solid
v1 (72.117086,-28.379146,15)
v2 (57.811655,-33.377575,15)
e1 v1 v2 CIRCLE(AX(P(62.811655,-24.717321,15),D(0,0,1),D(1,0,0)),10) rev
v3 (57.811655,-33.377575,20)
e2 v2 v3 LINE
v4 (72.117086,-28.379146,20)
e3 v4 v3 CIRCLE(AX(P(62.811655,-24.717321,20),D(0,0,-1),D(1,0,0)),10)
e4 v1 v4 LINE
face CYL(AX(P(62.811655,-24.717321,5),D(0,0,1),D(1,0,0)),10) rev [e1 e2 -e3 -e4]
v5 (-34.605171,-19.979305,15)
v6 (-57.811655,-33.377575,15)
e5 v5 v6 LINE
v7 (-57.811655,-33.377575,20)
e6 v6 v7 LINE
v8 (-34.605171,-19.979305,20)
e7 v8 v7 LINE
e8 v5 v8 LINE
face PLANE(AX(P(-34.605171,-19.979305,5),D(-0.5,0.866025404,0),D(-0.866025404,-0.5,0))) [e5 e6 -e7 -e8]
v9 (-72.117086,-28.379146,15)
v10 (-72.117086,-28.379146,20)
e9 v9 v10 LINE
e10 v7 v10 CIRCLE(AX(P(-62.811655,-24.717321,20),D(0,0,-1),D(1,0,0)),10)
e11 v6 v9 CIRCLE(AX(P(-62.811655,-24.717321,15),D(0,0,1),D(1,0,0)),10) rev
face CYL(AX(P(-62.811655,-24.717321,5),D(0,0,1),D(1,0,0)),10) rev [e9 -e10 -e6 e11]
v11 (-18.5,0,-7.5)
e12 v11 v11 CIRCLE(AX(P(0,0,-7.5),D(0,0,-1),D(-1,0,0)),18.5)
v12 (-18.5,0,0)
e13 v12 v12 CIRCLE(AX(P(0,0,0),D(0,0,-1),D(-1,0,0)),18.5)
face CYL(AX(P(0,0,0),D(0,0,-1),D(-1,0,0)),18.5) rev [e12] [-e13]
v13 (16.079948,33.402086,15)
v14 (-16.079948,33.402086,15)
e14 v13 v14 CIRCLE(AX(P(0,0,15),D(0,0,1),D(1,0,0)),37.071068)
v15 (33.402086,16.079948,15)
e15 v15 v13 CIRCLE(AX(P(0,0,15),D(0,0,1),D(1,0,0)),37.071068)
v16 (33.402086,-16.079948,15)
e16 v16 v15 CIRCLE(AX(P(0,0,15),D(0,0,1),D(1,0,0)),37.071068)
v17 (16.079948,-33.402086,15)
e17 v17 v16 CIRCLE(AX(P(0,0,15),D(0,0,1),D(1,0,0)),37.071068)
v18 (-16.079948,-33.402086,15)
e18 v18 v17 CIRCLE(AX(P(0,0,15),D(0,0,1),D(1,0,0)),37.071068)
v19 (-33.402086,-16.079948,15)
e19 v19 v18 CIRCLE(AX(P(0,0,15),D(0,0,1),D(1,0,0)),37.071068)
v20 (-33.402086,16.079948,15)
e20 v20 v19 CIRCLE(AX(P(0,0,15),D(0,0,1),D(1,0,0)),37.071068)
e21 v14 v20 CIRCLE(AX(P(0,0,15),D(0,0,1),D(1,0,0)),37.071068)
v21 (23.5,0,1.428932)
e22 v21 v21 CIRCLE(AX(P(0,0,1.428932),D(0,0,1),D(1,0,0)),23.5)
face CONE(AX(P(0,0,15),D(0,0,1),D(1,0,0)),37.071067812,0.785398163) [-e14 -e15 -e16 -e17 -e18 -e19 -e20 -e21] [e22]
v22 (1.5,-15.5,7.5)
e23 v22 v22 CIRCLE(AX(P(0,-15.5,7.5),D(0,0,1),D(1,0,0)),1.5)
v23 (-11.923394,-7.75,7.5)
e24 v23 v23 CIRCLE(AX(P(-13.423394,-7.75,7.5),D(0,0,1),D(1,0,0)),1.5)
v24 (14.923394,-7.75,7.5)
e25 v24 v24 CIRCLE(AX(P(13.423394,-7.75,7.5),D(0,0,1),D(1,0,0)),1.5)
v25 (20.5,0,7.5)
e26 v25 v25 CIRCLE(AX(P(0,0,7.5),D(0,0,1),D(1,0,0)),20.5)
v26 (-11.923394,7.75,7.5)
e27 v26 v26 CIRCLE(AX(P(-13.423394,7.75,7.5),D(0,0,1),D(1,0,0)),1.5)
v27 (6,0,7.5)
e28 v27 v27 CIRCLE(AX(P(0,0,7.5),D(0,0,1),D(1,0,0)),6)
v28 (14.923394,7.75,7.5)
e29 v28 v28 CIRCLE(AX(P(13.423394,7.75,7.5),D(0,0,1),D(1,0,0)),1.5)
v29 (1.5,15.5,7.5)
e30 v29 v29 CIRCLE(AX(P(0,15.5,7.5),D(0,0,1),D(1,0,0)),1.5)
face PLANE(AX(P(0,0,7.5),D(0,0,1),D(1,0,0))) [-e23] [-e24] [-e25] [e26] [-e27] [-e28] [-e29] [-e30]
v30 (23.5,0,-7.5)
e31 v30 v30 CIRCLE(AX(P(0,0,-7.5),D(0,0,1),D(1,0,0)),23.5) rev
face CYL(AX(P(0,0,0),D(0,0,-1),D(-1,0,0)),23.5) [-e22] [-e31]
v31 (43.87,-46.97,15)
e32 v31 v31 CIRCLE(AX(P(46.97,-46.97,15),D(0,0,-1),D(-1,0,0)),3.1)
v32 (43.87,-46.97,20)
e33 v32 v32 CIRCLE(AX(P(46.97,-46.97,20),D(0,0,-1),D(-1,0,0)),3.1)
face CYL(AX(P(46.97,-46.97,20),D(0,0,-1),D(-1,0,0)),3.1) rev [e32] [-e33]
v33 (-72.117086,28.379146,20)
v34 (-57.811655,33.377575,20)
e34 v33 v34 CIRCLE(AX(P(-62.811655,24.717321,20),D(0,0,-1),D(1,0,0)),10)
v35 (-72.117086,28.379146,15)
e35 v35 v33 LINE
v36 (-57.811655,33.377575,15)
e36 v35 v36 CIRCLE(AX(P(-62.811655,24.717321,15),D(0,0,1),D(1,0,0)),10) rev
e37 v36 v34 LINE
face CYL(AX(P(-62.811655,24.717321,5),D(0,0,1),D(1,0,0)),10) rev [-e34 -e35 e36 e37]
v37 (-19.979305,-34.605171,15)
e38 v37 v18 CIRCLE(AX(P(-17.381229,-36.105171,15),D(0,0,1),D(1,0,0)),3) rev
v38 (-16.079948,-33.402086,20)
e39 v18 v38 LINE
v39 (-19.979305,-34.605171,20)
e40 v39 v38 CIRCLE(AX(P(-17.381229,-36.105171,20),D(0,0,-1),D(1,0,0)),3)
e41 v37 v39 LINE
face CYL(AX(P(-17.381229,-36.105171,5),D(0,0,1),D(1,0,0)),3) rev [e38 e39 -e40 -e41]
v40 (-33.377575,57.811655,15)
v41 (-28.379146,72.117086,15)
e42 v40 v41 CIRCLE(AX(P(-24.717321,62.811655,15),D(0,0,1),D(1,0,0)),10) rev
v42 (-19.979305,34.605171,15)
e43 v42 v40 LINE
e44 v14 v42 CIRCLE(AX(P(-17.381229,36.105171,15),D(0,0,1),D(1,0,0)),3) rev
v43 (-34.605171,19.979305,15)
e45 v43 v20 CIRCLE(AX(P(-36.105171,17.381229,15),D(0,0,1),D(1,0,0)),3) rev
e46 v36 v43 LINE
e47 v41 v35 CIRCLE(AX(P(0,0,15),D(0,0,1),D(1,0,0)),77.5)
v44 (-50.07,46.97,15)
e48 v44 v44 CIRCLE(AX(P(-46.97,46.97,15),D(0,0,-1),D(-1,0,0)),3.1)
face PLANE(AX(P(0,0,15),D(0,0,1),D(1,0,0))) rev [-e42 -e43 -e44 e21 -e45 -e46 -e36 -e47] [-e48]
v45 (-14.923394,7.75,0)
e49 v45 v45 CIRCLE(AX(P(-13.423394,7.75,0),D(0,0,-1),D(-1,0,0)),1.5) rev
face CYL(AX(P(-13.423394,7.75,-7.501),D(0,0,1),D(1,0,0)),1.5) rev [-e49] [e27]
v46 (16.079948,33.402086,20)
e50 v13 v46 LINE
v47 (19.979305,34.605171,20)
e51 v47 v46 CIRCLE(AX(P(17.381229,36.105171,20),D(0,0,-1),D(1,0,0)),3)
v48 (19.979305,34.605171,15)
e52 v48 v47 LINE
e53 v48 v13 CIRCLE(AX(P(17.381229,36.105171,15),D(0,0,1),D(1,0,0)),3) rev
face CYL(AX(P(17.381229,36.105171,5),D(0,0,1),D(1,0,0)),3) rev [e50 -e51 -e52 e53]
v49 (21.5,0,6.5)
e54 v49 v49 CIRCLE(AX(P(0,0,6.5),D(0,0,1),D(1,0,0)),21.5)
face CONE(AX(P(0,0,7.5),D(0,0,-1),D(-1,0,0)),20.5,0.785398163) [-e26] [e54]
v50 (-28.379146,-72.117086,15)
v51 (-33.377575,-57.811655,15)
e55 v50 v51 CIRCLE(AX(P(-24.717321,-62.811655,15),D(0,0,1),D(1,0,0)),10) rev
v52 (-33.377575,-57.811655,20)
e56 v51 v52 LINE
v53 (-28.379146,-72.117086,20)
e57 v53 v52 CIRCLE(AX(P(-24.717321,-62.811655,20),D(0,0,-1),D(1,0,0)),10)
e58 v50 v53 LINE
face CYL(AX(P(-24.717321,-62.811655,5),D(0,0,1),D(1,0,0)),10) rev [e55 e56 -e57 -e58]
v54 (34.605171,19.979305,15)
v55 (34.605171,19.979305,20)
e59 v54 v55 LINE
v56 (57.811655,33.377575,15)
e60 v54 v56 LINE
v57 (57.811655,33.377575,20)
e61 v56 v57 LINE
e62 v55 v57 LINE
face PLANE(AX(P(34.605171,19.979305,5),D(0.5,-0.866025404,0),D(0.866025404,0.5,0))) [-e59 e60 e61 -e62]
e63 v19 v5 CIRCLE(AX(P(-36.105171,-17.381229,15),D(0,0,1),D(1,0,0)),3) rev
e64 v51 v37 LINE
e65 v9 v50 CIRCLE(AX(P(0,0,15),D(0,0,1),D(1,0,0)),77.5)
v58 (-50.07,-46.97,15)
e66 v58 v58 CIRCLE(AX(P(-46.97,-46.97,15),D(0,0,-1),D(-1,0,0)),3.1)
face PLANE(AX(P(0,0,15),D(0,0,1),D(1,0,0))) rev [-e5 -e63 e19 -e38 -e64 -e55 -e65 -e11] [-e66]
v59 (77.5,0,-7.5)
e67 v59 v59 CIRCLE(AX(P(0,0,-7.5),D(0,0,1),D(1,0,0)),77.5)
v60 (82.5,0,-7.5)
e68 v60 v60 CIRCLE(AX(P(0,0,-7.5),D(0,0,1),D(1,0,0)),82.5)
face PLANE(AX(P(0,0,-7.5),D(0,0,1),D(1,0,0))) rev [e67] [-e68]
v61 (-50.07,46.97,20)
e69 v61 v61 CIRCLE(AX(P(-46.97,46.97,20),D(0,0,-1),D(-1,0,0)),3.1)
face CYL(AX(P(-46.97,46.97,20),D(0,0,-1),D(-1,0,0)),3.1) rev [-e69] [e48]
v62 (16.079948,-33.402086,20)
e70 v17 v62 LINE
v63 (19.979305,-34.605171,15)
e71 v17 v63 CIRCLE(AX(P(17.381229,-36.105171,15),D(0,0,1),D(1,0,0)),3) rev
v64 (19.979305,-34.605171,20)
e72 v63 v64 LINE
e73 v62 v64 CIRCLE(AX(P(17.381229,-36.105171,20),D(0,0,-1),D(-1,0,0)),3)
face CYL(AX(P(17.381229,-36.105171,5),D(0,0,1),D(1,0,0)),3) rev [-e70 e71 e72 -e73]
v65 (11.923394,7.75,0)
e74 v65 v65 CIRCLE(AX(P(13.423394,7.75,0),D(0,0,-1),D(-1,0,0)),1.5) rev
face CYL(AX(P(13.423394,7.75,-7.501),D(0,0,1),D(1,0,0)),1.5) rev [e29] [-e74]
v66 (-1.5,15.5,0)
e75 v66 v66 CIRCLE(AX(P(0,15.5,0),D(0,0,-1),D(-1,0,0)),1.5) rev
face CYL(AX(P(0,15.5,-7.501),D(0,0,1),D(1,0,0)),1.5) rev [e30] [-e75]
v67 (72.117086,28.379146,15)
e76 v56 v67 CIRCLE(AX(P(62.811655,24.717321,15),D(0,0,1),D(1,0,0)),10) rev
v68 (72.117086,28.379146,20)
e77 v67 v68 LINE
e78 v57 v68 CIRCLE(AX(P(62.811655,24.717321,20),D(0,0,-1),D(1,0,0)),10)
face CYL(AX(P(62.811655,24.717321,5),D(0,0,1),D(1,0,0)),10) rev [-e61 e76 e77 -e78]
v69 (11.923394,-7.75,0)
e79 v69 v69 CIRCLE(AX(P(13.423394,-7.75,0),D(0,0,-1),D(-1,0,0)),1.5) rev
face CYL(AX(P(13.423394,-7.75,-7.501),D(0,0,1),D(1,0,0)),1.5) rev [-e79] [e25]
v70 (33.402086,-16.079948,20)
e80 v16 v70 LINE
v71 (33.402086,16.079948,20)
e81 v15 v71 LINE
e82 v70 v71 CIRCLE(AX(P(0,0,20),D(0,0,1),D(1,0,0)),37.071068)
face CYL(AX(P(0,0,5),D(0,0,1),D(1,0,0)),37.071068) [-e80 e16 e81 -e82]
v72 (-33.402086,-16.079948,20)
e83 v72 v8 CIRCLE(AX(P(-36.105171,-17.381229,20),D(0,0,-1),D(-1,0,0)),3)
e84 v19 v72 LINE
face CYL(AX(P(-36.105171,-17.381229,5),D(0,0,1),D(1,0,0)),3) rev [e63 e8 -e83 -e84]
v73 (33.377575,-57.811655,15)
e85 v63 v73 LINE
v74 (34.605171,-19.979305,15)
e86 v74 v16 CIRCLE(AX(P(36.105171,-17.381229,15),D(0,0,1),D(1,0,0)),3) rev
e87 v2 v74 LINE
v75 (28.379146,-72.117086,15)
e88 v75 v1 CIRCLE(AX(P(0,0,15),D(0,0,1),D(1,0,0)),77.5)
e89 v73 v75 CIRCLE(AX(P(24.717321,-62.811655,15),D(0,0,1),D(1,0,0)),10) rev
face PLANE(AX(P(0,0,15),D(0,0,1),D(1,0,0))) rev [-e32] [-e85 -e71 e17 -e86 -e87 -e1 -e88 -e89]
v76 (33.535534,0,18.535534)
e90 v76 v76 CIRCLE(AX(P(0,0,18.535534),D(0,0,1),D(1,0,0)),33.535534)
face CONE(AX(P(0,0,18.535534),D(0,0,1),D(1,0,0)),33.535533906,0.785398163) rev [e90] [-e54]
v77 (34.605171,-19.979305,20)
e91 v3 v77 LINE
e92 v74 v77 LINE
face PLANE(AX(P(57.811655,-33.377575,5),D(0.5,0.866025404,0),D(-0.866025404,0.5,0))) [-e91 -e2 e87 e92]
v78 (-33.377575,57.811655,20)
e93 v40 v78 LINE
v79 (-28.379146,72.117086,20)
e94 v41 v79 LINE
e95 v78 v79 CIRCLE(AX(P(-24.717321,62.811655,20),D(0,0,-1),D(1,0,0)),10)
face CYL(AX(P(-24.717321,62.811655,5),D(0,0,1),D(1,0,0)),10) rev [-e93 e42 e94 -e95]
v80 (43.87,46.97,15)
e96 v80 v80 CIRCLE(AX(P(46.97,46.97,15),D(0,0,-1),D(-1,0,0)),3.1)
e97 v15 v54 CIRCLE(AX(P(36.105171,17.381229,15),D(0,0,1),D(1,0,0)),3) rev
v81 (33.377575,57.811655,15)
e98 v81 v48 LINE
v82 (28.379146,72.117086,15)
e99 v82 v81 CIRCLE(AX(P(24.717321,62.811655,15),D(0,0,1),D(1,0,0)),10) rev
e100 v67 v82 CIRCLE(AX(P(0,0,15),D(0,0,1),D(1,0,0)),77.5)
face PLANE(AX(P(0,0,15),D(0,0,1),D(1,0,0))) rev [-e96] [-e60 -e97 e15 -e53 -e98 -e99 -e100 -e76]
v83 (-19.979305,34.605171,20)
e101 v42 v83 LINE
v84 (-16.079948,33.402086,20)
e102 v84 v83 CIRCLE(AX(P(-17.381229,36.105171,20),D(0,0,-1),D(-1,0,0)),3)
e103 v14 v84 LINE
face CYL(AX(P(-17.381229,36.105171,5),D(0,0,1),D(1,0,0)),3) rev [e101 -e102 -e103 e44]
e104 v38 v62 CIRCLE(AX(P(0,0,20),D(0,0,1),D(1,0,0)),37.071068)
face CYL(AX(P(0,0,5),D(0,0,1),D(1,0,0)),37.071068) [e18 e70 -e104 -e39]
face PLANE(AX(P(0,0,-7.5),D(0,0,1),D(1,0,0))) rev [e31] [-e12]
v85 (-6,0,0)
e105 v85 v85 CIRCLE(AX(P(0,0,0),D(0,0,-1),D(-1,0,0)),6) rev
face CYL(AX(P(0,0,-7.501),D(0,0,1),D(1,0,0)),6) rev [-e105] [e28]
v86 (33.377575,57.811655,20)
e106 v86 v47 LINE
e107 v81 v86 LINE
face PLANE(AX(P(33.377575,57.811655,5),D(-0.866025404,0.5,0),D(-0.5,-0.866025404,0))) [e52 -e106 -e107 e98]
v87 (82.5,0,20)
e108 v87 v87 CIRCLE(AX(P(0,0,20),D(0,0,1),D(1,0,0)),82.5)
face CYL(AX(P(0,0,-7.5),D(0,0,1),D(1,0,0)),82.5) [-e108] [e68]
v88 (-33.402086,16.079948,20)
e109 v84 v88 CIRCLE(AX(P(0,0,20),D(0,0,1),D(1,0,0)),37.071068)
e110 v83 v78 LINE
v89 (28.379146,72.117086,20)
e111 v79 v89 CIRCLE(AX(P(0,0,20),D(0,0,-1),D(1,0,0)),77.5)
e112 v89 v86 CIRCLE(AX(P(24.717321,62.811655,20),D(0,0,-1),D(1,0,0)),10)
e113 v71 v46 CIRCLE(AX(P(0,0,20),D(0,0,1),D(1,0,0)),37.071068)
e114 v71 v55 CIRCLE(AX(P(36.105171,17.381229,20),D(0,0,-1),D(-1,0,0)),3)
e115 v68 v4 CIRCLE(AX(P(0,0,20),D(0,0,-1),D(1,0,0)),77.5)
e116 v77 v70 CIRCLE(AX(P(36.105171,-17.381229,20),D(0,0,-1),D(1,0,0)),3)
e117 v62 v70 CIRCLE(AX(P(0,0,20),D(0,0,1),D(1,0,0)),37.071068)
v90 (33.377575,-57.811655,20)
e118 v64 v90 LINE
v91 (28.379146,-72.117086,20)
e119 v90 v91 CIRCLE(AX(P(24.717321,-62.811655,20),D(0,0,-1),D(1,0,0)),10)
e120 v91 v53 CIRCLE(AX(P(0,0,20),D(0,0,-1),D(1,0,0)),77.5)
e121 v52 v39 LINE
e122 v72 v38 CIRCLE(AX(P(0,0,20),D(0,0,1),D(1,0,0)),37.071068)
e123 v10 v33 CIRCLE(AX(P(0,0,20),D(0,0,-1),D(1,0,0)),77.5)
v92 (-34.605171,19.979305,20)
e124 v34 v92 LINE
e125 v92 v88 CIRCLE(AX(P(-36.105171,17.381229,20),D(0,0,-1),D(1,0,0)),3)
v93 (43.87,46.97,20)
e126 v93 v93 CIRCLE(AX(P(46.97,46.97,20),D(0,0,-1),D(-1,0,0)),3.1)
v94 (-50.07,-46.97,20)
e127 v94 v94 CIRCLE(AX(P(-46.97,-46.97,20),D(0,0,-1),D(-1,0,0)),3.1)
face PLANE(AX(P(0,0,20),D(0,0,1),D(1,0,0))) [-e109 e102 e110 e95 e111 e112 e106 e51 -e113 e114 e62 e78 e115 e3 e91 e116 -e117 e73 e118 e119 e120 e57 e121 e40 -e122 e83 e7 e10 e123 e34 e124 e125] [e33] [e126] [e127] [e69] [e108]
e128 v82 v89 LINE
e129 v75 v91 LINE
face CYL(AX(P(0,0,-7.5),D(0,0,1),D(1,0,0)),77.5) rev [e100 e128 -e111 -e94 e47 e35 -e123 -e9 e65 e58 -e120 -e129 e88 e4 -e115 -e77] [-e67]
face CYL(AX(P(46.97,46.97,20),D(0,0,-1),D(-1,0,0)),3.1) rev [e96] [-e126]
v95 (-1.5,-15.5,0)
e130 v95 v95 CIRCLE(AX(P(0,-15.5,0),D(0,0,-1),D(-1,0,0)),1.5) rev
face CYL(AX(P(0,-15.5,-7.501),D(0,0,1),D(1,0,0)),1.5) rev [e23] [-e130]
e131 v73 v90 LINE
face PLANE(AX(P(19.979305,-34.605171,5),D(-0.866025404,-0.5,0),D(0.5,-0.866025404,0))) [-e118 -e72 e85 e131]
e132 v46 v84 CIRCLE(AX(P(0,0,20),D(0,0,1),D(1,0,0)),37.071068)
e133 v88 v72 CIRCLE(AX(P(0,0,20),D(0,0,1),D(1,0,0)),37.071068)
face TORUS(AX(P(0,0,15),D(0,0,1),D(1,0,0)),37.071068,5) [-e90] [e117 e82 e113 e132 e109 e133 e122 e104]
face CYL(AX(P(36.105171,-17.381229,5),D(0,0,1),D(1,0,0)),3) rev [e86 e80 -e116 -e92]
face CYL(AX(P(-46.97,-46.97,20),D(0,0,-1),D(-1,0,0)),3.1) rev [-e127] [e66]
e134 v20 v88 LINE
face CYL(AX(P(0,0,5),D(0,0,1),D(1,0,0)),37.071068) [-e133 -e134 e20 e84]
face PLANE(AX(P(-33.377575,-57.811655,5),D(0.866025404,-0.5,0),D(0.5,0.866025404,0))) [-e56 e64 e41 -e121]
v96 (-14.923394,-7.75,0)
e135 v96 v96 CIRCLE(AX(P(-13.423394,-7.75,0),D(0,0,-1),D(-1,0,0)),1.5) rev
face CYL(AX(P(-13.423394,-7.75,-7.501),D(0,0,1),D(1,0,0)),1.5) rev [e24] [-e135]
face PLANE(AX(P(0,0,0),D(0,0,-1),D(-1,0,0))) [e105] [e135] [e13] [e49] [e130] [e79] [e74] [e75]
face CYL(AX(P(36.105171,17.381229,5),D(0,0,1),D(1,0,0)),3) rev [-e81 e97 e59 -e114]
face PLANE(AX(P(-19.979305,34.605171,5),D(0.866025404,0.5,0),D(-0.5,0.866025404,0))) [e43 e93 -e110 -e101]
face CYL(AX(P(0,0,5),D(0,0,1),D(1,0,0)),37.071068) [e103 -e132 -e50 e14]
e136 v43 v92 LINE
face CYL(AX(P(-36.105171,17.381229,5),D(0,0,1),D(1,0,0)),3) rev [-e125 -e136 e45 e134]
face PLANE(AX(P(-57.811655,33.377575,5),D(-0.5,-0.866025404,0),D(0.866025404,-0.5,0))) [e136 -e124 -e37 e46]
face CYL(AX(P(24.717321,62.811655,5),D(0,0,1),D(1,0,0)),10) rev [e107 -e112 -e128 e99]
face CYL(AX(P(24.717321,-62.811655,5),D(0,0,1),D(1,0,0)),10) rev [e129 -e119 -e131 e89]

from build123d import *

# Parameters (mm, degrees)
EXTRUDE_1_DEPTH          = 20
EXTRUDE_1_DEPTH_BACK     = 7.5
SKETCH_1_R               = 82.5
SKETCH_1_R_2             = 80
EXTRUDE_3_DEPTH          = 7.5
EXTRUDE_3_DEPTH_BACK     = 7.5
SKETCH_3_R               = 21.5
CHAMFER_1_SIZE           = 1
SKETCH_4_R               = 18.5
CUT_EXTRUDE_1_DEPTH      = 7.5
SKETCH_5_R               = 1.5
CUT_EXTRUDE_2_DEPTH      = 7.5
SKETCH_6_R               = 6
CUT_EXTRUDE_3_DEPTH      = 7.5
SKETCH_9_R               = 3.1
CUT_EXTRUDE_4_DEPTH      = 119.822346
CUT_EXTRUDE_5_DEPTH      = 10
CUT_EXTRUDE_5_DEPTH_BACK = 119.822346


# Read off the part's stored shape, not the designer's step: 抽壳1
with BuildPart() as part:
    # 草图1 → 凸台-拉伸1 (new, two sides: drawn at the far end of the back side and taken through both)
    with BuildSketch(Plane.XY.offset(-EXTRUDE_1_DEPTH_BACK)):
        Circle(SKETCH_1_R)
        Circle(SKETCH_1_R_2, mode=Mode.SUBTRACT)
    extrude(amount=EXTRUDE_1_DEPTH + EXTRUDE_1_DEPTH_BACK)



with BuildPart() as body_2:
    # 草图3 → 凸台-拉伸3 (new, two sides: drawn at the far end of the back side and taken through both)
    with BuildSketch(Plane.XY.offset(-EXTRUDE_3_DEPTH_BACK)):
        Circle(SKETCH_3_R)
    extrude(amount=EXTRUDE_3_DEPTH + EXTRUDE_3_DEPTH_BACK)

    # 倒角1
    chamfer_1_edges = [body_2.edges().sort_by_distance(p)[0] for p in [
        (-21.5, 0, 7.5),
    ]]
    chamfer(chamfer_1_edges, length=CHAMFER_1_SIZE)

    # 草图4 → 切除-拉伸1 (cut)
    with BuildSketch(Plane(origin=(0, 0, -7.5), x_dir=(-1, 0, 0), z_dir=(0, 0, -1))):
        Circle(SKETCH_4_R)
    extrude(amount=-CUT_EXTRUDE_1_DEPTH, mode=Mode.SUBTRACT)

    # 草图5 → 切除-拉伸2 (cut)
    with BuildSketch(Plane.XY.offset(7.5)):
        with Locations((0, 15.5)):
            Circle(SKETCH_5_R)
        with Locations((13.423394, 7.75)):
            Circle(SKETCH_5_R)
        with Locations((13.423394, -7.75)):
            Circle(SKETCH_5_R)
        with Locations((0, -15.5)):
            Circle(SKETCH_5_R)
        with Locations((-13.423394, -7.75)):
            Circle(SKETCH_5_R)
        with Locations((-13.423394, 7.75)):
            Circle(SKETCH_5_R)
    extrude(amount=-CUT_EXTRUDE_2_DEPTH, mode=Mode.SUBTRACT)

    # 草图6 → 切除-拉伸3 (cut)
    with BuildSketch(Plane.XY.offset(7.5)):
        Circle(SKETCH_6_R)
    extrude(amount=-CUT_EXTRUDE_3_DEPTH, mode=Mode.SUBTRACT)


with BuildPart() as part_1:
    add(part.part)

    add(body_2.part)  # 旋转1 merges body 2
    # 草图8 → 旋转1 (revolve)
    with BuildSketch(Plane(origin=(0, 0, 0), x_dir=(1, 0, 0), z_dir=(0, 1, 0)), mode=Mode.PRIVATE) as revolve_1_sk:
        with BuildLine():
            Line((-37.071068, -20), (-80, -20))
            Line((-80, -20), (-80, 0))
            Line((-80, 0), (-80, 0.5))
            Line((-80, 0.5), (-80, 7.5))
            Line((-80, 7.5), (-21.5, 7.5))
            Line((-21.5, 7.5), (-21.5, -6.5))
            Line((-21.5, -6.5), (-33.535534, -18.535534))
            ThreePointArc((-33.535534, -18.535534), (-35.157651, -19.619398), (-37.071068, -20))
        make_face()
    revolve(revolve_1_sk.sketch.rotate(Axis((0, 0, 0), (0, 0, -1)), 180), axis=Axis((0, 0, 0), (0, 0, -1)))

    # 抽壳1 outline → 抽壳1 (revolve, cut)
    with BuildSketch(Plane.XZ):
        Polygon((37.071068, 15), (23.5, 1.428932), (23.5, -7.5), (77.5, -7.5), (77.5, 15), align=None)
    revolve(axis=Axis((0, 0, 0), (0, 0, 1)), mode=Mode.SUBTRACT)

    # 草图9 → 切除-拉伸4 (cut, through all)
    with BuildSketch(Plane(origin=(0, 0, 15), x_dir=(-1, 0, 0), z_dir=(0, 0, -1))):
        with Locations((-46.97, 46.97)):
            Circle(SKETCH_9_R)
        with Locations((46.97, 46.97)):
            Circle(SKETCH_9_R)
        with Locations((46.97, -46.97)):
            Circle(SKETCH_9_R)
        with Locations((-46.97, -46.97)):
            Circle(SKETCH_9_R)
    extrude(amount=-CUT_EXTRUDE_4_DEPTH, mode=Mode.SUBTRACT)

    # 草图10 → 切除-拉伸5 (cut, two sides: drawn at the far end of the back side and taken through both)
    with BuildSketch(Plane(origin=(0, 0, 15), x_dir=(-1, 0, 0), z_dir=(0, 0, -1)).offset(-CUT_EXTRUDE_5_DEPTH_BACK)):
        with BuildLine():
            Line((-33.377575, 57.811655), (-19.979305, 34.605171))
            ThreePointArc((-19.979305, 34.605171), (-18.265691, 33.238513), (-16.079948, 33.402086))
            ThreePointArc((-16.079948, 33.402086), (0, 37.071068), (16.079948, 33.402086))
            ThreePointArc((16.079948, 33.402086), (18.265691, 33.238513), (19.979305, 34.605171))
            Line((19.979305, 34.605171), (33.377575, 57.811655))
            ThreePointArc((33.377575, 57.811655), (34.157646, 66.110179), (28.379146, 72.117086))
            ThreePointArc((28.379146, 72.117086), (0, 77.5), (-28.379146, 72.117086))
            ThreePointArc((-28.379146, 72.117086), (-34.157646, 66.110179), (-33.377575, 57.811655))
        make_face()
        with BuildLine():
            Line((57.811655, 33.377575), (34.605171, 19.979305))
            ThreePointArc((34.605171, 19.979305), (33.238513, 18.265691), (33.402086, 16.079948))
            ThreePointArc((33.402086, 16.079948), (37.071068, 0), (33.402086, -16.079948))
            ThreePointArc((33.402086, -16.079948), (33.238513, -18.265691), (34.605171, -19.979305))
            Line((34.605171, -19.979305), (57.811655, -33.377575))
            ThreePointArc((57.811655, -33.377575), (66.110179, -34.157646), (72.117086, -28.379146))
            ThreePointArc((72.117086, -28.379146), (77.5, 0), (72.117086, 28.379146))
            ThreePointArc((72.117086, 28.379146), (66.110179, 34.157646), (57.811655, 33.377575))
        make_face()
        with BuildLine():
            Line((33.377575, -57.811655), (19.979305, -34.605171))
            ThreePointArc((19.979305, -34.605171), (18.265691, -33.238513), (16.079948, -33.402086))
            ThreePointArc((16.079948, -33.402086), (0, -37.071068), (-16.079948, -33.402086))
            ThreePointArc((-16.079948, -33.402086), (-18.265691, -33.238513), (-19.979305, -34.605171))
            Line((-19.979305, -34.605171), (-33.377575, -57.811655))
            ThreePointArc((-33.377575, -57.811655), (-34.157646, -66.110179), (-28.379146, -72.117086))
            ThreePointArc((-28.379146, -72.117086), (0, -77.5), (28.379146, -72.117086))
            ThreePointArc((28.379146, -72.117086), (34.157646, -66.110179), (33.377575, -57.811655))
        make_face()
        with BuildLine():
            Line((-57.811655, -33.377575), (-34.605171, -19.979305))
            ThreePointArc((-34.605171, -19.979305), (-33.238513, -18.265691), (-33.402086, -16.079948))
            ThreePointArc((-33.402086, -16.079948), (-37.071068, 0), (-33.402086, 16.079948))
            ThreePointArc((-33.402086, 16.079948), (-33.238513, 18.265691), (-34.605171, 19.979305))
            Line((-34.605171, 19.979305), (-57.811655, 33.377575))
            ThreePointArc((-57.811655, 33.377575), (-66.110179, 34.157646), (-72.117086, 28.379146))
            ThreePointArc((-72.117086, 28.379146), (-77.5, 0), (-72.117086, -28.379146))
            ThreePointArc((-72.117086, -28.379146), (-66.110179, -34.157646), (-57.811655, -33.377575))
        make_face()
    extrude(amount=CUT_EXTRUDE_5_DEPTH + CUT_EXTRUDE_5_DEPTH_BACK, mode=Mode.SUBTRACT)


solid = part_1.part
